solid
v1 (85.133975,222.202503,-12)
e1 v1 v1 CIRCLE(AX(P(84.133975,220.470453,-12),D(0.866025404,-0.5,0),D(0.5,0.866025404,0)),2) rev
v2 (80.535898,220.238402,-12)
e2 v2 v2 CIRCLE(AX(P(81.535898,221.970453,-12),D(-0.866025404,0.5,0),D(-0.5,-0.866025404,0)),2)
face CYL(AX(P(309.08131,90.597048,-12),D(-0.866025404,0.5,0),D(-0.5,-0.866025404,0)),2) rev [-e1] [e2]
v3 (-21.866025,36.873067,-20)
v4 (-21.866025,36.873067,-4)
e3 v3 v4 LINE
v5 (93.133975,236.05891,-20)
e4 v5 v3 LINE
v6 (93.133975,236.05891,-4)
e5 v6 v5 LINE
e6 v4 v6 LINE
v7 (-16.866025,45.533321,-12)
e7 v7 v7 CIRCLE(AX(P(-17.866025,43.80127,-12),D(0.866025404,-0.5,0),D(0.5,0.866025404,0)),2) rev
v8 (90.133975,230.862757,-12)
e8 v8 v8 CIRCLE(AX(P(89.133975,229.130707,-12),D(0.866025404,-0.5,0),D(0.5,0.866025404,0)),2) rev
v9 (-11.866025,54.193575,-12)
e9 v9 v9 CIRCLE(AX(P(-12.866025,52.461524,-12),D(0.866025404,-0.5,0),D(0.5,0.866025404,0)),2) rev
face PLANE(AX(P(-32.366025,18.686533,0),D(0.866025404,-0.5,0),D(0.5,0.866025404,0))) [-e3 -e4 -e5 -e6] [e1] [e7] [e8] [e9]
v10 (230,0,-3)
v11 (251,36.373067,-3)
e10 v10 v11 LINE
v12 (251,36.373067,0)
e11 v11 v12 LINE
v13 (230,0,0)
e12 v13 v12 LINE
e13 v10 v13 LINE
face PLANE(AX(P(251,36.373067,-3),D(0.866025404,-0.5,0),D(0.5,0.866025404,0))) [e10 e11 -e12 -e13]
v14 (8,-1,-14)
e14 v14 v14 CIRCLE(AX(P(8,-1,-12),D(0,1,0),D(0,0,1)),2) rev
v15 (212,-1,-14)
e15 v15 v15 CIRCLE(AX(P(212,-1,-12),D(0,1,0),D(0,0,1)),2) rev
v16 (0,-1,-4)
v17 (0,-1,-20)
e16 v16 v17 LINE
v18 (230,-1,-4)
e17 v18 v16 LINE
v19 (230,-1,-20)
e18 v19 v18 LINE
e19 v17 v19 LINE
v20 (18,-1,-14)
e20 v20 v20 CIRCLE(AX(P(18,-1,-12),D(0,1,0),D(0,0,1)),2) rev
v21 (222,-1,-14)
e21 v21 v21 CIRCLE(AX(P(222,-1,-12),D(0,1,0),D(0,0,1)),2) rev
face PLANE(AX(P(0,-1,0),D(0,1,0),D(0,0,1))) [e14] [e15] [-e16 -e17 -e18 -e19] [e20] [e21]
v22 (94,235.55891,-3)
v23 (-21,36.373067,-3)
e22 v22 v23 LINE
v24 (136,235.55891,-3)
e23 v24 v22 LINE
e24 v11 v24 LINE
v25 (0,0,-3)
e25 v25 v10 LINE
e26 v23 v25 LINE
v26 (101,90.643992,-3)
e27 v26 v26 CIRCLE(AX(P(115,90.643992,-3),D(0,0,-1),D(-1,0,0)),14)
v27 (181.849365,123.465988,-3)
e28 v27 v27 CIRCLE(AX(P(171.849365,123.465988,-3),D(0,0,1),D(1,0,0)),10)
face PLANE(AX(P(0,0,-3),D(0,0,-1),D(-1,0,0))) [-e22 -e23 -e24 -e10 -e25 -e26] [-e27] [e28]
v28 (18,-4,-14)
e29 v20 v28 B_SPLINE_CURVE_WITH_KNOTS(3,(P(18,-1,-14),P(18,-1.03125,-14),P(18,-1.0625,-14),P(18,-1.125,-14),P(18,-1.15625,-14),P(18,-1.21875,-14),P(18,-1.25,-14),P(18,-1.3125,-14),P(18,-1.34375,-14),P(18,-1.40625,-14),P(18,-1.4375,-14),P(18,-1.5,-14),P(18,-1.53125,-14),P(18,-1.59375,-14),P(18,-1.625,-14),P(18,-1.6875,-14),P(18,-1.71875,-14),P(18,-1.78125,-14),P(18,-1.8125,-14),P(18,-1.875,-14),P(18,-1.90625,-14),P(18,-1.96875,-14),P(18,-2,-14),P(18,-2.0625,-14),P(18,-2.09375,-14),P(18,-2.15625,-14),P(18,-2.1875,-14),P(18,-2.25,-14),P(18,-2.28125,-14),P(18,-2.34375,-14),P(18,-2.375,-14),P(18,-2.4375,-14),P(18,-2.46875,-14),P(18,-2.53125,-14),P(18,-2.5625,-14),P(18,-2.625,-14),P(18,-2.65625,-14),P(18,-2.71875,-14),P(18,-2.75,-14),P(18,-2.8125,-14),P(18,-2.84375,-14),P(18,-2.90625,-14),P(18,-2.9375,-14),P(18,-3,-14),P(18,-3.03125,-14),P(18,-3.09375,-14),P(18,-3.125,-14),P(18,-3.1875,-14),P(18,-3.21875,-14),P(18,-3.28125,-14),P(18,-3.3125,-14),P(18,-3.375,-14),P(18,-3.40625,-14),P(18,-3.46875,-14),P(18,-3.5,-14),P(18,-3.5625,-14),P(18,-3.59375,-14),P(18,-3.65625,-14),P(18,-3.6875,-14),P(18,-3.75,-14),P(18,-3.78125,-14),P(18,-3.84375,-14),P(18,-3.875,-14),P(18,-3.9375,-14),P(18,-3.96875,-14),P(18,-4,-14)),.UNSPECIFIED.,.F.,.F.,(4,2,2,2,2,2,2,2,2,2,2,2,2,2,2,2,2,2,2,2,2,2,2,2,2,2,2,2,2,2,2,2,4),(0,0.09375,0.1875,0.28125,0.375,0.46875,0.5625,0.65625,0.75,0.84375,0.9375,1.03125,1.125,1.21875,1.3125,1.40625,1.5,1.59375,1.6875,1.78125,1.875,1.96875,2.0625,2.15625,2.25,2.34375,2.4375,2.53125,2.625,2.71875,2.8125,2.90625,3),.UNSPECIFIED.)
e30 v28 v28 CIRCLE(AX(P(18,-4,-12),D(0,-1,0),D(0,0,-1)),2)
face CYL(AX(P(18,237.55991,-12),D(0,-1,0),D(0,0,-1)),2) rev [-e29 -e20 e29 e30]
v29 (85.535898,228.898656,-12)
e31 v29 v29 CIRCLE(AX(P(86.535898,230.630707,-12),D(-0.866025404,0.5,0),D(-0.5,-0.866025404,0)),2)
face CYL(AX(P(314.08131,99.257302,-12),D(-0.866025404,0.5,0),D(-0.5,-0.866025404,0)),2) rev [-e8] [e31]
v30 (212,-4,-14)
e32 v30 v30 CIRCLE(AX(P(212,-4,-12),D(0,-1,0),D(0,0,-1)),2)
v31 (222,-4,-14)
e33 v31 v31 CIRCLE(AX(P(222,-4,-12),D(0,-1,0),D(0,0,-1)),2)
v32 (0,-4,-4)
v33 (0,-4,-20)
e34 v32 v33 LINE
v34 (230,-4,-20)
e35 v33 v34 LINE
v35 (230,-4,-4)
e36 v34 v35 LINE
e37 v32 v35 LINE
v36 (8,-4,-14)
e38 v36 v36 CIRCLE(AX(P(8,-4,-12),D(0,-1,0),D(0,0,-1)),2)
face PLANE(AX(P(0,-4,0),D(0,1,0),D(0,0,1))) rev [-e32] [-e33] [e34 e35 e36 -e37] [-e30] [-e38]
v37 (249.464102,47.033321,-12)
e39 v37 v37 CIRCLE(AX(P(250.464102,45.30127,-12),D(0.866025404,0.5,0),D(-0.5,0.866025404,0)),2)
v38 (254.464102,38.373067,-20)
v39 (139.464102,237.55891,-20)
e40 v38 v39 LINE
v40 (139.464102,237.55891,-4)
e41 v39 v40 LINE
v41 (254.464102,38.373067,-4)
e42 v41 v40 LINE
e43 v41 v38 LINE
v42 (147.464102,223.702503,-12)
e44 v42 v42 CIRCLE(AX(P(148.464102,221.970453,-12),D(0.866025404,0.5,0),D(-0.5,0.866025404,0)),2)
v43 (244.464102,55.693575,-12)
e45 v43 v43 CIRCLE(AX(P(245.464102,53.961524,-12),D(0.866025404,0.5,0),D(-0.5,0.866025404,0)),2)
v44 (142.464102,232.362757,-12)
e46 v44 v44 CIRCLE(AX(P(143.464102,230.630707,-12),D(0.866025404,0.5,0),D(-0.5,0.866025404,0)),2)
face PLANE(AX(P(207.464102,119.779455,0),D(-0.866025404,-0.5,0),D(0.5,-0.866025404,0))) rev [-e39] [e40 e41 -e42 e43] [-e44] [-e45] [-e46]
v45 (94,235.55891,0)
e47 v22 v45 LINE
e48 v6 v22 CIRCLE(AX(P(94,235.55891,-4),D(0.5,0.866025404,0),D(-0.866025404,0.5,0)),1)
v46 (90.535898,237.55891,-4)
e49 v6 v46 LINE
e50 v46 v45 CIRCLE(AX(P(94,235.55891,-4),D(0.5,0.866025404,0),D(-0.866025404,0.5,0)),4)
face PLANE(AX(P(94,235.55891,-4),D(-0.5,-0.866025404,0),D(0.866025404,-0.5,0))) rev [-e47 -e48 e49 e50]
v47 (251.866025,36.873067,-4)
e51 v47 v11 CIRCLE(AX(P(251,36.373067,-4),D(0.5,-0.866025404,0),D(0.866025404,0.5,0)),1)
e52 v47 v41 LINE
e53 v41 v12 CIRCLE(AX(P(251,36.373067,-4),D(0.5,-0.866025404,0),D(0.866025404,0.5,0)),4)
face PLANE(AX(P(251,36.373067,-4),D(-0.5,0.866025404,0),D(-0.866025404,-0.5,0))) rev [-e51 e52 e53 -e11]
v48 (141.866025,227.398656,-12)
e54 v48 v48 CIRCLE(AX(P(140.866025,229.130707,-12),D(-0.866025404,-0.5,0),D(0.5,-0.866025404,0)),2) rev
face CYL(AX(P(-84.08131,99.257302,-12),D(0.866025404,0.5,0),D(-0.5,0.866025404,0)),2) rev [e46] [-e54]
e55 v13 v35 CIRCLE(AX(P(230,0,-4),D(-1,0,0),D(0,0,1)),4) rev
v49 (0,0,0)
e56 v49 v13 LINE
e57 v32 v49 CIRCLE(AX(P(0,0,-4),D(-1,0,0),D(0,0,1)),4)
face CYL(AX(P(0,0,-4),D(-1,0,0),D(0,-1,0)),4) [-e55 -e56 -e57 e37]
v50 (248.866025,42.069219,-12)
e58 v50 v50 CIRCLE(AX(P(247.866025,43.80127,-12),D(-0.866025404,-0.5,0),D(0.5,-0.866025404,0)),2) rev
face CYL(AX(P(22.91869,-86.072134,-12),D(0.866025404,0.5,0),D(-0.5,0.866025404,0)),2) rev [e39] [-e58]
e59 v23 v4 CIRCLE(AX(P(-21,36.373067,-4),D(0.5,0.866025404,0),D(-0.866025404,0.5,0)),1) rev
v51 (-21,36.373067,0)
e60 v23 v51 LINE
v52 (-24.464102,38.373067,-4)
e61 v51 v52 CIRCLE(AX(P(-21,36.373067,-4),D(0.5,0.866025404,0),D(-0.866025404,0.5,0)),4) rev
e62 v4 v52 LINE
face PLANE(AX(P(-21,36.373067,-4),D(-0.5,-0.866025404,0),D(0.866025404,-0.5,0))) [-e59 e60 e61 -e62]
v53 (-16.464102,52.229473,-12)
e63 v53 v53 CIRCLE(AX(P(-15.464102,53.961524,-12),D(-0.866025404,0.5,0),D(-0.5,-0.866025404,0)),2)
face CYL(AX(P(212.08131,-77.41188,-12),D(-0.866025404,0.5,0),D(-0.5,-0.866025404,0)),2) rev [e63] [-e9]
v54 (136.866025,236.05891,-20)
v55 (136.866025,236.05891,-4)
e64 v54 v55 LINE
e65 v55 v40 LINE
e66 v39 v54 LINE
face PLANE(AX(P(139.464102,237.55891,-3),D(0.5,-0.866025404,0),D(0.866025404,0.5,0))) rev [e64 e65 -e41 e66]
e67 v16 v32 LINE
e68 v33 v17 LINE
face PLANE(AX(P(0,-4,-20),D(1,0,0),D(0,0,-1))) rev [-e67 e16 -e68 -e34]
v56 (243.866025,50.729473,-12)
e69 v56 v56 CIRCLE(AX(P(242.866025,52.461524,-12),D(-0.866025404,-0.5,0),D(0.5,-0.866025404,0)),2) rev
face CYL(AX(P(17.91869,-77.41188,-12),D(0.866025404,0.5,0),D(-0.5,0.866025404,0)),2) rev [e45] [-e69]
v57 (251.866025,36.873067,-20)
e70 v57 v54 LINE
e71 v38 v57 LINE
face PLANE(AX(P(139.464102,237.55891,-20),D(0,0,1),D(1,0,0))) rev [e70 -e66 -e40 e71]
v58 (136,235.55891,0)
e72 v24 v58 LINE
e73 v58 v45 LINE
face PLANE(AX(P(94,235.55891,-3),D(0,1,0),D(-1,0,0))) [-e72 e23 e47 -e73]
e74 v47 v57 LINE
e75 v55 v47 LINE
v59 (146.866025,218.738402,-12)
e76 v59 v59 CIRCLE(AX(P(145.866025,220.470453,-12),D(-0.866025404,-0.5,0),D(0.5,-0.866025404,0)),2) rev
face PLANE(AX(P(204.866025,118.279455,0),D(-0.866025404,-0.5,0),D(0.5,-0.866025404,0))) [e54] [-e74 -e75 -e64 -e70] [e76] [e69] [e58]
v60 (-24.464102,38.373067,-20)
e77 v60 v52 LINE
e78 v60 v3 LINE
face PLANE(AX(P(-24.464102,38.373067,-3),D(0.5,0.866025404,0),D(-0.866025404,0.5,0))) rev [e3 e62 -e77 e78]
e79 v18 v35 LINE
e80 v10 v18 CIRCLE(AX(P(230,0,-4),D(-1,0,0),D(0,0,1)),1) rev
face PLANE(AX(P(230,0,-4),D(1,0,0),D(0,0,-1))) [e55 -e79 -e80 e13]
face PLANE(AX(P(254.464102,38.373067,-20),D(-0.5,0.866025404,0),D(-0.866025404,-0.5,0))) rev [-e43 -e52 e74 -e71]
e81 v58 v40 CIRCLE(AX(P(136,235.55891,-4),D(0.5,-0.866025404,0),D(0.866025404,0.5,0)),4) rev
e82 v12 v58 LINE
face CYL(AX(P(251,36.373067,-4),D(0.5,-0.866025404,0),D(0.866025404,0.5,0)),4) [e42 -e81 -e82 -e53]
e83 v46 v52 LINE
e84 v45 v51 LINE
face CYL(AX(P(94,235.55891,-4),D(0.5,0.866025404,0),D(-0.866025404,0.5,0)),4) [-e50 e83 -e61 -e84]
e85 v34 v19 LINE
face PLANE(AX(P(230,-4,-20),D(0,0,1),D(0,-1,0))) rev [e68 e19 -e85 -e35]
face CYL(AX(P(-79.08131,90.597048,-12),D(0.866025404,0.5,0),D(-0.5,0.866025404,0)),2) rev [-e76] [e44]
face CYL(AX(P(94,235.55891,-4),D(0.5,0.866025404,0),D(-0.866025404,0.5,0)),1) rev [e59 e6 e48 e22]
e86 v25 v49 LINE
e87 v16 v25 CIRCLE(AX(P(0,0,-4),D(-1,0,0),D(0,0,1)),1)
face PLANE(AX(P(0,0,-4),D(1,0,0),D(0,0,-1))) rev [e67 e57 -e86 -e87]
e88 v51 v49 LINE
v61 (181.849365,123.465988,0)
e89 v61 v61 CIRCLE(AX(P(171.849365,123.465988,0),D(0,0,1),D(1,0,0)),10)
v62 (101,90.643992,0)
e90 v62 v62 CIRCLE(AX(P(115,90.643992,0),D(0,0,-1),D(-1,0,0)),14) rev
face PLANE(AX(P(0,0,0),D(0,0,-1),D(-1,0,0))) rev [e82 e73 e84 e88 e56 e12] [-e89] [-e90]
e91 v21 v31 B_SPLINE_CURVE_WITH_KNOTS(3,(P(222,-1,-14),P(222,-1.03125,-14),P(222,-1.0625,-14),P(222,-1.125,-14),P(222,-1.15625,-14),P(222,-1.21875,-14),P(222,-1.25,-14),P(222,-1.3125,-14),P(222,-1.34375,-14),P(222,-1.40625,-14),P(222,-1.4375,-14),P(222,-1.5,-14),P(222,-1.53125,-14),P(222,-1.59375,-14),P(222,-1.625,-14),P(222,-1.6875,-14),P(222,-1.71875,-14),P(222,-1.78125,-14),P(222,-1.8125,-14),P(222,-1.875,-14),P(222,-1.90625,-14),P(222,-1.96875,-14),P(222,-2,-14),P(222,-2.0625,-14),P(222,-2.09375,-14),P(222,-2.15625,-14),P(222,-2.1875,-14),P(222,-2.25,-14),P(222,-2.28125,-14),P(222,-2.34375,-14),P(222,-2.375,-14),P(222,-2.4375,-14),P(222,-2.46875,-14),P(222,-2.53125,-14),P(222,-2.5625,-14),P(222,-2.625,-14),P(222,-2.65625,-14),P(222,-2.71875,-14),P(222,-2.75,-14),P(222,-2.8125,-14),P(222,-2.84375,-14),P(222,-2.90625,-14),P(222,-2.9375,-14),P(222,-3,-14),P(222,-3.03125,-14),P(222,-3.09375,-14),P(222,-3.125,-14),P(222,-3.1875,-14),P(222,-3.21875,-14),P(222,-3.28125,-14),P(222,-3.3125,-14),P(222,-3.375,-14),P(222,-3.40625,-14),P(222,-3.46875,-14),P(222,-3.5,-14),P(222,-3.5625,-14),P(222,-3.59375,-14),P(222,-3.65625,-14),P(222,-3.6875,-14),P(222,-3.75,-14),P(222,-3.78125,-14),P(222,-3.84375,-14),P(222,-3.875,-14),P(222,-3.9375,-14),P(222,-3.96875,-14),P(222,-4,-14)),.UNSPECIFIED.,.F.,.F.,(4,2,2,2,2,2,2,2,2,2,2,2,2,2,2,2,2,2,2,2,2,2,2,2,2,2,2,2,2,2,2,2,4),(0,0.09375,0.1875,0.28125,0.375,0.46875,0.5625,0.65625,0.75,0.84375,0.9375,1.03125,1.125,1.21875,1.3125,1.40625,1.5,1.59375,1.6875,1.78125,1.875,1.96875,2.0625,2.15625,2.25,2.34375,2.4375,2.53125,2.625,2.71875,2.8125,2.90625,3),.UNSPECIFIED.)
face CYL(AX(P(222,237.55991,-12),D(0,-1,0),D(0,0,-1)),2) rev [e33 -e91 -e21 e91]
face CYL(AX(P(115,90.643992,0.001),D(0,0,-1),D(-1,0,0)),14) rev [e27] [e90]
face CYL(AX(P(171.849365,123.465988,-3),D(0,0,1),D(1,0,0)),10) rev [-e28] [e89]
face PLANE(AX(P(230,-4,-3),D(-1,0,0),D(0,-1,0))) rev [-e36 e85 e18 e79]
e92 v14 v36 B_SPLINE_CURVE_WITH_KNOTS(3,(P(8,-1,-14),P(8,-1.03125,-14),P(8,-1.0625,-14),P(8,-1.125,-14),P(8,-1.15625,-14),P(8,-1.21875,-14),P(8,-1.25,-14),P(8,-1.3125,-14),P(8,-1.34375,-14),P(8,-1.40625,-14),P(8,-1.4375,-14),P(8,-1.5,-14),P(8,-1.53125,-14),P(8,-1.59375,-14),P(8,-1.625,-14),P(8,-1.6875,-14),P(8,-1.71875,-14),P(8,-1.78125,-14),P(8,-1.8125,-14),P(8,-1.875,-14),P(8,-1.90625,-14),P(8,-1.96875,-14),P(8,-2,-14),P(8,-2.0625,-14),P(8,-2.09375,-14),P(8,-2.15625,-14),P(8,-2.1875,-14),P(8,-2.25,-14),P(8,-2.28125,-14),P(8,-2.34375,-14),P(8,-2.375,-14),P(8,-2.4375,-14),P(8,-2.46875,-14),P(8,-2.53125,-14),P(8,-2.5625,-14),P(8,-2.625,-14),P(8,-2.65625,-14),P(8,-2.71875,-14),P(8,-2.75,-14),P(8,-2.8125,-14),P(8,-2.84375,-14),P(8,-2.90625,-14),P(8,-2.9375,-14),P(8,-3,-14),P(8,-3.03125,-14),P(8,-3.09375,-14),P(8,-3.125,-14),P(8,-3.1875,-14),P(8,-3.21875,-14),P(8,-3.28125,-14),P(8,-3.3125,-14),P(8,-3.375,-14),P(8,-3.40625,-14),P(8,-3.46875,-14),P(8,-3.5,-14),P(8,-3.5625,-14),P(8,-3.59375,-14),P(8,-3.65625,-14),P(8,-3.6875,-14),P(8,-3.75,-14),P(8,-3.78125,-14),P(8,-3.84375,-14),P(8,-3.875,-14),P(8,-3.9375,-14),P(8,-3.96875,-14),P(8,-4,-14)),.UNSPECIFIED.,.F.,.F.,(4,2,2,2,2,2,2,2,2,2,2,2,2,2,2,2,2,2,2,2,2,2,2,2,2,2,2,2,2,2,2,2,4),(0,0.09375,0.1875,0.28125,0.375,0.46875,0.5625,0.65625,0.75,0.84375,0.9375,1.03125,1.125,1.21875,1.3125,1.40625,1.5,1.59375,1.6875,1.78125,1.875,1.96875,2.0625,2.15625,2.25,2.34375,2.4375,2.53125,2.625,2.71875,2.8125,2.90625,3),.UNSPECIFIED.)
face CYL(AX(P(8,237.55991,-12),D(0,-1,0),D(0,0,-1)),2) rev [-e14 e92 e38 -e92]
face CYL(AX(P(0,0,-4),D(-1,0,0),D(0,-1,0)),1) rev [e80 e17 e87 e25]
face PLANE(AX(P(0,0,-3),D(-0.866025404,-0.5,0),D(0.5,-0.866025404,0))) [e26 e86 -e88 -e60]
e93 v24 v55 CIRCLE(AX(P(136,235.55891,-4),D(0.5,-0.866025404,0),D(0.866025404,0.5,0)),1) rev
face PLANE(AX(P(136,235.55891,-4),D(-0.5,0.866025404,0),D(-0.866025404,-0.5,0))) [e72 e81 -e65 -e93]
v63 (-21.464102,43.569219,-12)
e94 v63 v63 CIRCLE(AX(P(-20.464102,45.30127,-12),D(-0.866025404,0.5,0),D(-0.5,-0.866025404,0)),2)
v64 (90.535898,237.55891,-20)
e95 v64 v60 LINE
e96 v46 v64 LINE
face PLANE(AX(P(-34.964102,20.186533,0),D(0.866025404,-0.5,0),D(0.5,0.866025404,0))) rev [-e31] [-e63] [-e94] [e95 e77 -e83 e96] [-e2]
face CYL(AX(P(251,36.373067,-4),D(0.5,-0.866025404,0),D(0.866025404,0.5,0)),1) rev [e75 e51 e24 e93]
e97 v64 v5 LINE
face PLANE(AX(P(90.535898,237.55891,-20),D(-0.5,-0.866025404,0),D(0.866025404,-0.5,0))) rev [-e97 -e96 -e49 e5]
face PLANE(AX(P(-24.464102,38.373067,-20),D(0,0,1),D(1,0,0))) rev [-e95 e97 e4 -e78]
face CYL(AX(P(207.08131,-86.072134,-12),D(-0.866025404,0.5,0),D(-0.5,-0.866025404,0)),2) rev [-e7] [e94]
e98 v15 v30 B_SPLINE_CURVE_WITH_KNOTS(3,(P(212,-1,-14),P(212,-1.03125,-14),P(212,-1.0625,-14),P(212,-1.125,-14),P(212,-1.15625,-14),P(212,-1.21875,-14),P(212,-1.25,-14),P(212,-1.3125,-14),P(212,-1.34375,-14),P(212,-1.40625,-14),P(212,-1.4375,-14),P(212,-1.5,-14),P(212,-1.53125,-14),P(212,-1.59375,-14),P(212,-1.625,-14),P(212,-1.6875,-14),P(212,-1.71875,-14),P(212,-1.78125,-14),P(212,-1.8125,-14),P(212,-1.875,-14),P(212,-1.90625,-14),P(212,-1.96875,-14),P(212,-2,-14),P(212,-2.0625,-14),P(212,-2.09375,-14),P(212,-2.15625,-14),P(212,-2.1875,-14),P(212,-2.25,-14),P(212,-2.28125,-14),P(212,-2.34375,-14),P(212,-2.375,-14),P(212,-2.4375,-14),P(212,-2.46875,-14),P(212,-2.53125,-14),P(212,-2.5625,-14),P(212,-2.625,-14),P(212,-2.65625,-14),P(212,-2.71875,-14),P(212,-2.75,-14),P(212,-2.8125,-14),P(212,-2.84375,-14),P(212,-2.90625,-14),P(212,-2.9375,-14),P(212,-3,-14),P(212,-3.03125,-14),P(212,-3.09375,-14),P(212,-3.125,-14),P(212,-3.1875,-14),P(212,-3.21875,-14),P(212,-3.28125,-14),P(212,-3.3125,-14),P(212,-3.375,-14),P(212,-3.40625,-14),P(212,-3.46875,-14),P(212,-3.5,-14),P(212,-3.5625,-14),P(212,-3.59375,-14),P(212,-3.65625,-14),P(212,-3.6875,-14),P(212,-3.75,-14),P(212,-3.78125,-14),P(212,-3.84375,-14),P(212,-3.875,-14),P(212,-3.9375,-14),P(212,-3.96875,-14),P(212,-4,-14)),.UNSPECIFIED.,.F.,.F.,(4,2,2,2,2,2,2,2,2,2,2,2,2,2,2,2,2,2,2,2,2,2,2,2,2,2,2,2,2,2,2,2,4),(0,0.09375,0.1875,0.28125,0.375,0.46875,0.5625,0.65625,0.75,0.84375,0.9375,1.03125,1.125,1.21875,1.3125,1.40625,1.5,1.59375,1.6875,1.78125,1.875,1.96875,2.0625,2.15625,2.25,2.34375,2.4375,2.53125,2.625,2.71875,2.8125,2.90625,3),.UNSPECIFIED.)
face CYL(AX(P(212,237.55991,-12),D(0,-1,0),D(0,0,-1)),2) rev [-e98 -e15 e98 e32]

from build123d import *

# Parameters (mm, degrees)
SKETCH_10_R                   = 10
SM_BASE_FLANGE_3_DEPTH        = 3
SM_EDGE_FLANGE_6_DEPTH        = 230
SM_EDGE_FLANGE_6_BEND_DEPTH   = 230
SM_EDGE_FLANGE_6_BEND_2_DEPTH = 230
CUT_EXTRUDE_4_REACH           = 364.518
SKETCH_47_R                   = 2
CUT_EXTRUDE_6_REACH           = 265.651
SKETCH_50_R                   = 2
CUT_EXTRUDE_7_REACH           = 353.429
SKETCH_51_R                   = 2
CUT_EXTRUDE_8_REACH           = 350.533
SKETCH_52_R                   = 14


# Sheet-metal steps are written as plain solids
with BuildPart() as part:
    # Эскиз10 → Базовая кромка3 (new body)
    with BuildSketch(Plane.XY):
        Polygon((0, 0), (-21, 36.373066959), (94, 235.558909829), (136, 235.558909829), (251, 36.373066959), (230, 0), align=None)
        with Locations((171.849364905, 123.465988394)):
            Circle(SKETCH_10_R, mode=Mode.SUBTRACT)
    extrude(amount=-SM_BASE_FLANGE_3_DEPTH)

    # Ребро-кромка6 section (across the edge) → Ребро-кромка6 (add)
    with BuildSketch(Plane(origin=(-21.866025404, 36.873066959, -3), x_dir=(0.8660254037844436, -0.4999999999999914, -3.4914813388431334e-15), z_dir=(0.4999999999999914, 0.8660254037844436, 0))):
        with BuildLine():
            Line((-3, 1), (-3, 17))
            Line((-3, 17), (0, 17))
            Line((0, 17), (0, 1))
            ThreePointArc((0, 1), (0.292893219, 0.292893219), (1, 0))
            Line((1, 0), (1, -3))
            ThreePointArc((1, -3), (-1.828427125, -1.828427125), (-3, 1))
        make_face()
    extrude(amount=SM_EDGE_FLANGE_6_DEPTH)

    # Ребро-кромка6 section 2 (across the edge) → Ребро-кромка6 bend (add)
    with BuildSketch(Plane(origin=(136.866025404, 236.058909829, -3), x_dir=(-0.8660254037844363, -0.5000000000000041, -3.4914813388431334e-15), z_dir=(0.5000000000000041, -0.8660254037844363, 0))):
        with BuildLine():
            Line((-3, 1), (-3, 17))
            Line((-3, 17), (0, 17))
            Line((0, 17), (0, 1))
            ThreePointArc((0, 1), (0.292893219, 0.292893219), (1, 0))
            Line((1, 0), (1, -3))
            ThreePointArc((1, -3), (-1.828427125, -1.828427125), (-3, 1))
        make_face()
    extrude(amount=SM_EDGE_FLANGE_6_BEND_DEPTH)

    # Ребро-кромка6 section 3 (across the edge) → Ребро-кромка6 bend 2 (add)
    with BuildSketch(Plane(origin=(230, -1, -3), x_dir=(0, 1, 0), z_dir=(-1, 0, 0))):
        with BuildLine():
            Line((-3, 1), (-3, 17))
            Line((-3, 17), (0, 17))
            Line((0, 17), (0, 1))
            ThreePointArc((0, 1), (0.292893219, 0.292893219), (1, 0))
            Line((1, 0), (1, -3))
            ThreePointArc((1, -3), (-1.828427125, -1.828427125), (-3, 1))
        make_face()
    extrude(amount=SM_EDGE_FLANGE_6_BEND_2_DEPTH)

    # Эскиз47 → Вырез-Вытянуть4 (cut, up to next)
    with BuildSketch(Plane(origin=(-34.964101615, 20.186533479, 0), x_dir=(0, 0, 1), z_dir=(-0.866025403784443, 0.4999999999999925, 3.788649256556814e-15)), mode=Mode.PRIVATE) as cut_extrude_4_sk1:
        with Locations(Location((-12, 29, 0), (0, 0, 270))):
            Circle(SKETCH_47_R)
    cut_extrude_4_tool1 = extrude(cut_extrude_4_sk1.sketch, amount=-CUT_EXTRUDE_4_REACH, mode=Mode.PRIVATE) & part.part
    # Эскиз47 → Вырез-Вытянуть4 (cut, up to next)
    with BuildSketch(Plane(origin=(-34.964101615, 20.186533479, 0), x_dir=(0, 0, 1), z_dir=(-0.866025403784443, 0.4999999999999925, 3.788649256556814e-15)), mode=Mode.PRIVATE) as cut_extrude_4_sk2:
        with Locations(Location((-12, 39, 0), (0, 0, 270))):
            Circle(SKETCH_47_R)
    cut_extrude_4_tool2 = extrude(cut_extrude_4_sk2.sketch, amount=-CUT_EXTRUDE_4_REACH, mode=Mode.PRIVATE) & part.part
    # Эскиз47 → Вырез-Вытянуть4 (cut, up to next)
    with BuildSketch(Plane(origin=(-34.964101615, 20.186533479, 0), x_dir=(0, 0, 1), z_dir=(-0.866025403784443, 0.4999999999999925, 3.788649256556814e-15)), mode=Mode.PRIVATE) as cut_extrude_4_sk3:
        with Locations(Location((-12, 233, 0), (0, 0, 270))):
            Circle(SKETCH_47_R)
    cut_extrude_4_tool3 = extrude(cut_extrude_4_sk3.sketch, amount=-CUT_EXTRUDE_4_REACH, mode=Mode.PRIVATE) & part.part
    # Эскиз47 → Вырез-Вытянуть4 (cut, up to next)
    with BuildSketch(Plane(origin=(-34.964101615, 20.186533479, 0), x_dir=(0, 0, 1), z_dir=(-0.866025403784443, 0.4999999999999925, 3.788649256556814e-15)), mode=Mode.PRIVATE) as cut_extrude_4_sk4:
        with Locations(Location((-12, 243, 0), (0, 0, 270))):
            Circle(SKETCH_47_R)
    cut_extrude_4_tool4 = extrude(cut_extrude_4_sk4.sketch, amount=-CUT_EXTRUDE_4_REACH, mode=Mode.PRIVATE) & part.part
    add(cut_extrude_4_tool1.solids().sort_by_distance((-20.464102, 45.30127, -12))[0], mode=Mode.SUBTRACT)
    add(cut_extrude_4_tool2.solids().sort_by_distance((-15.464102, 53.961524, -12))[0], mode=Mode.SUBTRACT)
    add(cut_extrude_4_tool3.solids().sort_by_distance((81.535898, 221.970453, -12))[0], mode=Mode.SUBTRACT)
    add(cut_extrude_4_tool4.solids().sort_by_distance((86.535898, 230.630707, -12))[0], mode=Mode.SUBTRACT)

    # Эскиз50 → Вырез-Вытянуть6 (cut, up to next)
    with BuildSketch(Plane(origin=(207.464101615, 119.779454915, 0), x_dir=(0, 0, -1), z_dir=(0.866025403784436, 0.5000000000000047, 3.0623287353932815e-15)), mode=Mode.PRIVATE) as cut_extrude_6_sk1:
        with Locations(Location((12, -86, 0), (0, 0, 90))):
            Circle(SKETCH_50_R)
    cut_extrude_6_tool1 = extrude(cut_extrude_6_sk1.sketch, amount=-CUT_EXTRUDE_6_REACH, mode=Mode.PRIVATE) & part.part
    # Эскиз50 → Вырез-Вытянуть6 (cut, up to next)
    with BuildSketch(Plane(origin=(207.464101615, 119.779454915, 0), x_dir=(0, 0, -1), z_dir=(0.866025403784436, 0.5000000000000047, 3.0623287353932815e-15)), mode=Mode.PRIVATE) as cut_extrude_6_sk2:
        with Locations(Location((12, -76, 0), (0, 0, 90))):
            Circle(SKETCH_50_R)
    cut_extrude_6_tool2 = extrude(cut_extrude_6_sk2.sketch, amount=-CUT_EXTRUDE_6_REACH, mode=Mode.PRIVATE) & part.part
    # Эскиз50 → Вырез-Вытянуть6 (cut, up to next)
    with BuildSketch(Plane(origin=(207.464101615, 119.779454915, 0), x_dir=(0, 0, -1), z_dir=(0.866025403784436, 0.5000000000000047, 3.0623287353932815e-15)), mode=Mode.PRIVATE) as cut_extrude_6_sk3:
        with Locations(Location((12, 118, 0), (0, 0, 90))):
            Circle(SKETCH_50_R)
    cut_extrude_6_tool3 = extrude(cut_extrude_6_sk3.sketch, amount=-CUT_EXTRUDE_6_REACH, mode=Mode.PRIVATE) & part.part
    # Эскиз50 → Вырез-Вытянуть6 (cut, up to next)
    with BuildSketch(Plane(origin=(207.464101615, 119.779454915, 0), x_dir=(0, 0, -1), z_dir=(0.866025403784436, 0.5000000000000047, 3.0623287353932815e-15)), mode=Mode.PRIVATE) as cut_extrude_6_sk4:
        with Locations(Location((12, 128, 0), (0, 0, 90))):
            Circle(SKETCH_50_R)
    cut_extrude_6_tool4 = extrude(cut_extrude_6_sk4.sketch, amount=-CUT_EXTRUDE_6_REACH, mode=Mode.PRIVATE) & part.part
    add(cut_extrude_6_tool1.solids().sort_by_distance((250.464102, 45.30127, -12))[0], mode=Mode.SUBTRACT)
    add(cut_extrude_6_tool2.solids().sort_by_distance((245.464102, 53.961524, -12))[0], mode=Mode.SUBTRACT)
    add(cut_extrude_6_tool3.solids().sort_by_distance((148.464102, 221.970453, -12))[0], mode=Mode.SUBTRACT)
    add(cut_extrude_6_tool4.solids().sort_by_distance((143.464102, 230.630707, -12))[0], mode=Mode.SUBTRACT)

    # Эскиз51 → Вырез-Вытянуть7 (cut, up to next)
    with BuildSketch(Plane.XZ.offset(4), mode=Mode.PRIVATE) as cut_extrude_7_sk1:
        with Locations(Location((222, -12, 0), (0, 0, 270))):
            Circle(SKETCH_51_R)
    cut_extrude_7_tool1 = extrude(cut_extrude_7_sk1.sketch, amount=-CUT_EXTRUDE_7_REACH, mode=Mode.PRIVATE) & part.part
    # Эскиз51 → Вырез-Вытянуть7 (cut, up to next)
    with BuildSketch(Plane.XZ.offset(4), mode=Mode.PRIVATE) as cut_extrude_7_sk2:
        with Locations(Location((212, -12, 0), (0, 0, 270))):
            Circle(SKETCH_51_R)
    cut_extrude_7_tool2 = extrude(cut_extrude_7_sk2.sketch, amount=-CUT_EXTRUDE_7_REACH, mode=Mode.PRIVATE) & part.part
    # Эскиз51 → Вырез-Вытянуть7 (cut, up to next)
    with BuildSketch(Plane.XZ.offset(4), mode=Mode.PRIVATE) as cut_extrude_7_sk3:
        with Locations(Location((18, -12, 0), (0, 0, 270))):
            Circle(SKETCH_51_R)
    cut_extrude_7_tool3 = extrude(cut_extrude_7_sk3.sketch, amount=-CUT_EXTRUDE_7_REACH, mode=Mode.PRIVATE) & part.part
    # Эскиз51 → Вырез-Вытянуть7 (cut, up to next)
    with BuildSketch(Plane.XZ.offset(4), mode=Mode.PRIVATE) as cut_extrude_7_sk4:
        with Locations(Location((8, -12, 0), (0, 0, 270))):
            Circle(SKETCH_51_R)
    cut_extrude_7_tool4 = extrude(cut_extrude_7_sk4.sketch, amount=-CUT_EXTRUDE_7_REACH, mode=Mode.PRIVATE) & part.part
    add(cut_extrude_7_tool1.solids().sort_by_distance((222, -4, -12))[0], mode=Mode.SUBTRACT)
    add(cut_extrude_7_tool2.solids().sort_by_distance((212, -4, -12))[0], mode=Mode.SUBTRACT)
    add(cut_extrude_7_tool3.solids().sort_by_distance((18, -4, -12))[0], mode=Mode.SUBTRACT)
    add(cut_extrude_7_tool4.solids().sort_by_distance((8, -4, -12))[0], mode=Mode.SUBTRACT)

    # Эскиз52 → Вырез-Вытянуть8 (cut, up to next)
    with BuildSketch(Plane(origin=(0, 0, -3), x_dir=(-1, 0, 0), z_dir=(0, 0, -1)), mode=Mode.PRIVATE) as cut_extrude_8_sk1:
        with Locations((-115, 90.643992263)):
            Circle(SKETCH_52_R)
    cut_extrude_8_tool1 = extrude(cut_extrude_8_sk1.sketch, amount=-CUT_EXTRUDE_8_REACH, mode=Mode.PRIVATE) & part.part
    add(cut_extrude_8_tool1.solids().sort_by_distance((115, 90.643992, -3))[0], mode=Mode.SUBTRACT)


solid = part.part
